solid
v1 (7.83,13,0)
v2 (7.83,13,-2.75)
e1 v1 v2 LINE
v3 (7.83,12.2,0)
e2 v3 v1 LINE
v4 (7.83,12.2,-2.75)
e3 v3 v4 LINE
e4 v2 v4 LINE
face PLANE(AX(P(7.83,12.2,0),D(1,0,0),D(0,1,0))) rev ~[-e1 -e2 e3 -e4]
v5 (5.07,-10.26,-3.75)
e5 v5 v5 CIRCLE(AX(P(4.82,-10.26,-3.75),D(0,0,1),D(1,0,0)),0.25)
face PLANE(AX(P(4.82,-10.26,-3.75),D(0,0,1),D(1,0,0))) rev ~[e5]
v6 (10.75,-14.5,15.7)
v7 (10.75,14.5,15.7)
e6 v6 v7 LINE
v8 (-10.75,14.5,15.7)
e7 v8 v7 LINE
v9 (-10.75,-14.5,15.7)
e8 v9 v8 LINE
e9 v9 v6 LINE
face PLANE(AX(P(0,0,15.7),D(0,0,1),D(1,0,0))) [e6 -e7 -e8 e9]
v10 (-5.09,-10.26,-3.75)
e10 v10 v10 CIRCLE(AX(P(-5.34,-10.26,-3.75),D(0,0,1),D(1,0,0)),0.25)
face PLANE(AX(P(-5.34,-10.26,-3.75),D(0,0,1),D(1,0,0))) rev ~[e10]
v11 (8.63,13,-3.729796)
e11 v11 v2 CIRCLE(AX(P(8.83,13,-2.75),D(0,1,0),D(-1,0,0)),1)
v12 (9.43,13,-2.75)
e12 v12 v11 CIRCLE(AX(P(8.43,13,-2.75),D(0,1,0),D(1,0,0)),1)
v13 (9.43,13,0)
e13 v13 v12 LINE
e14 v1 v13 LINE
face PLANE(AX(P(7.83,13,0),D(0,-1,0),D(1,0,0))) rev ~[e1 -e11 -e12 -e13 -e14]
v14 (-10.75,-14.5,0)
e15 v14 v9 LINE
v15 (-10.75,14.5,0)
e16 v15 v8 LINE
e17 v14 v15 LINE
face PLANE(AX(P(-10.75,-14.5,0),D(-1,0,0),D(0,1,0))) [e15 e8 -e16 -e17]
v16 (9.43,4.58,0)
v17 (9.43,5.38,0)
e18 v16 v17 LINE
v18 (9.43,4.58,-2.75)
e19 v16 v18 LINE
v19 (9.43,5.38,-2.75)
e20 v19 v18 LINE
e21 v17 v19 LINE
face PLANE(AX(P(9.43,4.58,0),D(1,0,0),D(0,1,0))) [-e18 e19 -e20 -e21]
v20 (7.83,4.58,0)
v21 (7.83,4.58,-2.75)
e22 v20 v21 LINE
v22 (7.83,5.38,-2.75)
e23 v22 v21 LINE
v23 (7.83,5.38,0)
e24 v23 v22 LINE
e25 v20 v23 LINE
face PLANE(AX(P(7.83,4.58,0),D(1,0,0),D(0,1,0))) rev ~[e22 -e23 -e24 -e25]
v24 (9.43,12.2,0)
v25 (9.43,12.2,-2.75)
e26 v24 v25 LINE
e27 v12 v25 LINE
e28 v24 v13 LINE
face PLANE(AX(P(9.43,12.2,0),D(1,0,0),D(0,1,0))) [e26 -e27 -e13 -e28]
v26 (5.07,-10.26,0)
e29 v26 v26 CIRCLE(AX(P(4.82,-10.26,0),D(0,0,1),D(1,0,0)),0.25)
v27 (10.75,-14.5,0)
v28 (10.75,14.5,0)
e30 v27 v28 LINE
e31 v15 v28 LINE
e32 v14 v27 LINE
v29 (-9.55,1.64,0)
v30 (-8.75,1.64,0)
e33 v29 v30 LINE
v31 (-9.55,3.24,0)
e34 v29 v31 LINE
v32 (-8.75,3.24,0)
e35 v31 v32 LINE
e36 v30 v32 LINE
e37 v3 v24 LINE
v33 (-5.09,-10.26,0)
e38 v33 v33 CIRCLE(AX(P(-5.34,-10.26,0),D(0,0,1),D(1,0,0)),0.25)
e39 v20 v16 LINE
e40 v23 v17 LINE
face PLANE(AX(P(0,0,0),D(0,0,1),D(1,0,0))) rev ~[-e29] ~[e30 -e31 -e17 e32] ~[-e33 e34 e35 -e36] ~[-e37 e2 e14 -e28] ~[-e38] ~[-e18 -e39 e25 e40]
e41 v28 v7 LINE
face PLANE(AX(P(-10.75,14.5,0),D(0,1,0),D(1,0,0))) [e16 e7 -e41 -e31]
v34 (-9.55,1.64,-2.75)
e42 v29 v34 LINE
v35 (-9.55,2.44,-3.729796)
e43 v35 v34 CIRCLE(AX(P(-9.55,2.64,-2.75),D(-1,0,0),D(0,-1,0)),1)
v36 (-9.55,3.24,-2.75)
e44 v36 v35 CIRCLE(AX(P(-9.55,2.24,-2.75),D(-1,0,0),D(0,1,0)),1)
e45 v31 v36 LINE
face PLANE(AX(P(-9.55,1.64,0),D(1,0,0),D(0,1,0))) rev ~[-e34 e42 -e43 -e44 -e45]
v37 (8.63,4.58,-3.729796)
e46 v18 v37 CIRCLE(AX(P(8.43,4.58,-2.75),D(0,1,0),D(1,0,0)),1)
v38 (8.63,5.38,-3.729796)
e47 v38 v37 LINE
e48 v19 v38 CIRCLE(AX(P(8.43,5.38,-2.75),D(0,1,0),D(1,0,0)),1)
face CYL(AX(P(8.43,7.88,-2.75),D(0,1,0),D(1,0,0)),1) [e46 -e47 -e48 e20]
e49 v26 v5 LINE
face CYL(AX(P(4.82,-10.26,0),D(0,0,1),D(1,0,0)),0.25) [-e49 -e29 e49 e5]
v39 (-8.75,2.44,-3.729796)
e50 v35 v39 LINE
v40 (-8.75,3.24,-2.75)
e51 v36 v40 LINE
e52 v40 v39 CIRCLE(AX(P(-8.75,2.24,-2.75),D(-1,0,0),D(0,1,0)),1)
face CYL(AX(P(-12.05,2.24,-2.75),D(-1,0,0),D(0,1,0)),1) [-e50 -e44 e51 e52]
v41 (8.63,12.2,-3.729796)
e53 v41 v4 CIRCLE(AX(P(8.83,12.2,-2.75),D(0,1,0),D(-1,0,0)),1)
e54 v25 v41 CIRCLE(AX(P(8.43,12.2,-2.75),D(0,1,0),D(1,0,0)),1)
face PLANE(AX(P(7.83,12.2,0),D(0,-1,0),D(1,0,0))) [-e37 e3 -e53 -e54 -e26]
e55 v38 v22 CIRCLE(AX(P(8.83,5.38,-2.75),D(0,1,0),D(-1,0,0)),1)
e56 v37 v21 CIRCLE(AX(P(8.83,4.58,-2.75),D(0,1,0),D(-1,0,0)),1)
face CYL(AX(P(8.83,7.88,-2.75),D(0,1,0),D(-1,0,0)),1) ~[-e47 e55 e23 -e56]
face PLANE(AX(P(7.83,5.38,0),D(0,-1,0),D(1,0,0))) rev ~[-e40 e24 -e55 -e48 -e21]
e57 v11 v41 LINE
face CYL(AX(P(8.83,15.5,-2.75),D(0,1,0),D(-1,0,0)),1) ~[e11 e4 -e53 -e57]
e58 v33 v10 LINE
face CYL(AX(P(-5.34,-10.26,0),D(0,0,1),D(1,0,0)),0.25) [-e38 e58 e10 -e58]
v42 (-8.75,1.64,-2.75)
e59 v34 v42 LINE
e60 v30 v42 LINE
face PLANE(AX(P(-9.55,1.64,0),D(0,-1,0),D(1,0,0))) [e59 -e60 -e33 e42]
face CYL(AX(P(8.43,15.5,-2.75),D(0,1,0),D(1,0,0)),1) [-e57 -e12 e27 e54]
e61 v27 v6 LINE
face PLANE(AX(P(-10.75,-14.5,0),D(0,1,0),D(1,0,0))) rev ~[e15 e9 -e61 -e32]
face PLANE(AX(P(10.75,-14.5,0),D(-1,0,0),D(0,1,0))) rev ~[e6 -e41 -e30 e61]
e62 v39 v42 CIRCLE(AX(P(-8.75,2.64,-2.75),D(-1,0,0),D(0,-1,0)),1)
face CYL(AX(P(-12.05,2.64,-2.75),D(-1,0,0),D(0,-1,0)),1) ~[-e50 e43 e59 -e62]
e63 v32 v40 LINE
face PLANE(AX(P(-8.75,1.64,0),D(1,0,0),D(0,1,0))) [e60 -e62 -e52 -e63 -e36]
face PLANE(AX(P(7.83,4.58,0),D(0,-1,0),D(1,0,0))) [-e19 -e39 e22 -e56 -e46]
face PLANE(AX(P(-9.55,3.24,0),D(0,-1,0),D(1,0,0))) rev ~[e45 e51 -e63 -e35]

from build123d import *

# Parameters (mm, degrees)
F0_W        = 21.5
F0_H        = 29
F1_DEPTH    = 15.7
F2_W        = 1.6
F2_H        = 0.8
F2_R        = 0.25
F2_W_2      = 0.8
F2_H_2      = 1.6
F3_DEPTH    = 3.75
F4_T1_DEPTH = 5.8
F4_T3_DEPTH = 5.8
F4_T5_DEPTH = 5.8


# Not quite as in the source:
# - a fillet or chamfer that OpenCascade refuses, or shapes differently, is made with other operations: its cross-section is extruded or revolved along the edge and cut away or added


with BuildPart() as f1:
    # F0 (on Top) → F1 (new body)
    with BuildSketch(Plane.XY):
        Rectangle(F0_W, F0_H)
    extrude(amount=F1_DEPTH)

    # F2 (on face) → F3 (join)
    with BuildSketch(Plane.XY):
        with Locations((8.63, 12.6)):
            Rectangle(F2_W, F2_H)
        with Locations((8.63, 4.98)):
            Rectangle(F2_W, F2_H)
        with Locations((-5.34, -10.26)):
            Circle(F2_R)
        with Locations((4.82, -10.26)):
            Circle(F2_R)
        with Locations((-9.15, 2.44)):
            Rectangle(F2_W_2, F2_H_2)
    extrude(amount=-F3_DEPTH)

    # F4: fillet of radius 1 on 6 edges, made by hand

    # F4_s2 → F4_t1 (cut)
    with BuildSketch(Plane.XZ.offset(-15.5)):
        with BuildLine():
            ThreePointArc((7.83, -2.75), (8.1228932188, -3.4571067812), (8.83, -3.75))
            Line((8.83, -3.75), (7.83, -3.75))
            Line((7.83, -3.75), (7.83, -2.75))
        make_face()
        with BuildLine():
            ThreePointArc((9.43, -2.75), (9.1371067812, -3.4571067812), (8.43, -3.75))
            Line((8.43, -3.75), (9.43, -3.75))
            Line((9.43, -3.75), (9.43, -2.75))
        make_face()
    extrude(amount=F4_T1_DEPTH, mode=Mode.SUBTRACT)

    # F4_s4 → F4_t3 (cut)
    with BuildSketch(Plane.XZ.offset(-7.88)):
        with BuildLine():
            ThreePointArc((7.83, -2.75), (8.1228932188, -3.4571067812), (8.83, -3.75))
            Line((8.83, -3.75), (7.83, -3.75))
            Line((7.83, -3.75), (7.83, -2.75))
        make_face()
        with BuildLine():
            ThreePointArc((9.43, -2.75), (9.1371067812, -3.4571067812), (8.43, -3.75))
            Line((8.43, -3.75), (9.43, -3.75))
            Line((9.43, -3.75), (9.43, -2.75))
        make_face()
    extrude(amount=F4_T3_DEPTH, mode=Mode.SUBTRACT)

    # F4_s6 → F4_t5 (cut)
    with BuildSketch(Plane.YZ.offset(-12.05)):
        with BuildLine():
            ThreePointArc((1.64, -2.75), (1.9328932188, -3.4571067812), (2.64, -3.75))
            Line((2.64, -3.75), (1.64, -3.75))
            Line((1.64, -3.75), (1.64, -2.75))
        make_face()
        with BuildLine():
            ThreePointArc((3.24, -2.75), (2.9471067812, -3.4571067812), (2.24, -3.75))
            Line((2.24, -3.75), (3.24, -3.75))
            Line((3.24, -3.75), (3.24, -2.75))
        make_face()
    extrude(amount=F4_T5_DEPTH, mode=Mode.SUBTRACT)


solid = f1.part
